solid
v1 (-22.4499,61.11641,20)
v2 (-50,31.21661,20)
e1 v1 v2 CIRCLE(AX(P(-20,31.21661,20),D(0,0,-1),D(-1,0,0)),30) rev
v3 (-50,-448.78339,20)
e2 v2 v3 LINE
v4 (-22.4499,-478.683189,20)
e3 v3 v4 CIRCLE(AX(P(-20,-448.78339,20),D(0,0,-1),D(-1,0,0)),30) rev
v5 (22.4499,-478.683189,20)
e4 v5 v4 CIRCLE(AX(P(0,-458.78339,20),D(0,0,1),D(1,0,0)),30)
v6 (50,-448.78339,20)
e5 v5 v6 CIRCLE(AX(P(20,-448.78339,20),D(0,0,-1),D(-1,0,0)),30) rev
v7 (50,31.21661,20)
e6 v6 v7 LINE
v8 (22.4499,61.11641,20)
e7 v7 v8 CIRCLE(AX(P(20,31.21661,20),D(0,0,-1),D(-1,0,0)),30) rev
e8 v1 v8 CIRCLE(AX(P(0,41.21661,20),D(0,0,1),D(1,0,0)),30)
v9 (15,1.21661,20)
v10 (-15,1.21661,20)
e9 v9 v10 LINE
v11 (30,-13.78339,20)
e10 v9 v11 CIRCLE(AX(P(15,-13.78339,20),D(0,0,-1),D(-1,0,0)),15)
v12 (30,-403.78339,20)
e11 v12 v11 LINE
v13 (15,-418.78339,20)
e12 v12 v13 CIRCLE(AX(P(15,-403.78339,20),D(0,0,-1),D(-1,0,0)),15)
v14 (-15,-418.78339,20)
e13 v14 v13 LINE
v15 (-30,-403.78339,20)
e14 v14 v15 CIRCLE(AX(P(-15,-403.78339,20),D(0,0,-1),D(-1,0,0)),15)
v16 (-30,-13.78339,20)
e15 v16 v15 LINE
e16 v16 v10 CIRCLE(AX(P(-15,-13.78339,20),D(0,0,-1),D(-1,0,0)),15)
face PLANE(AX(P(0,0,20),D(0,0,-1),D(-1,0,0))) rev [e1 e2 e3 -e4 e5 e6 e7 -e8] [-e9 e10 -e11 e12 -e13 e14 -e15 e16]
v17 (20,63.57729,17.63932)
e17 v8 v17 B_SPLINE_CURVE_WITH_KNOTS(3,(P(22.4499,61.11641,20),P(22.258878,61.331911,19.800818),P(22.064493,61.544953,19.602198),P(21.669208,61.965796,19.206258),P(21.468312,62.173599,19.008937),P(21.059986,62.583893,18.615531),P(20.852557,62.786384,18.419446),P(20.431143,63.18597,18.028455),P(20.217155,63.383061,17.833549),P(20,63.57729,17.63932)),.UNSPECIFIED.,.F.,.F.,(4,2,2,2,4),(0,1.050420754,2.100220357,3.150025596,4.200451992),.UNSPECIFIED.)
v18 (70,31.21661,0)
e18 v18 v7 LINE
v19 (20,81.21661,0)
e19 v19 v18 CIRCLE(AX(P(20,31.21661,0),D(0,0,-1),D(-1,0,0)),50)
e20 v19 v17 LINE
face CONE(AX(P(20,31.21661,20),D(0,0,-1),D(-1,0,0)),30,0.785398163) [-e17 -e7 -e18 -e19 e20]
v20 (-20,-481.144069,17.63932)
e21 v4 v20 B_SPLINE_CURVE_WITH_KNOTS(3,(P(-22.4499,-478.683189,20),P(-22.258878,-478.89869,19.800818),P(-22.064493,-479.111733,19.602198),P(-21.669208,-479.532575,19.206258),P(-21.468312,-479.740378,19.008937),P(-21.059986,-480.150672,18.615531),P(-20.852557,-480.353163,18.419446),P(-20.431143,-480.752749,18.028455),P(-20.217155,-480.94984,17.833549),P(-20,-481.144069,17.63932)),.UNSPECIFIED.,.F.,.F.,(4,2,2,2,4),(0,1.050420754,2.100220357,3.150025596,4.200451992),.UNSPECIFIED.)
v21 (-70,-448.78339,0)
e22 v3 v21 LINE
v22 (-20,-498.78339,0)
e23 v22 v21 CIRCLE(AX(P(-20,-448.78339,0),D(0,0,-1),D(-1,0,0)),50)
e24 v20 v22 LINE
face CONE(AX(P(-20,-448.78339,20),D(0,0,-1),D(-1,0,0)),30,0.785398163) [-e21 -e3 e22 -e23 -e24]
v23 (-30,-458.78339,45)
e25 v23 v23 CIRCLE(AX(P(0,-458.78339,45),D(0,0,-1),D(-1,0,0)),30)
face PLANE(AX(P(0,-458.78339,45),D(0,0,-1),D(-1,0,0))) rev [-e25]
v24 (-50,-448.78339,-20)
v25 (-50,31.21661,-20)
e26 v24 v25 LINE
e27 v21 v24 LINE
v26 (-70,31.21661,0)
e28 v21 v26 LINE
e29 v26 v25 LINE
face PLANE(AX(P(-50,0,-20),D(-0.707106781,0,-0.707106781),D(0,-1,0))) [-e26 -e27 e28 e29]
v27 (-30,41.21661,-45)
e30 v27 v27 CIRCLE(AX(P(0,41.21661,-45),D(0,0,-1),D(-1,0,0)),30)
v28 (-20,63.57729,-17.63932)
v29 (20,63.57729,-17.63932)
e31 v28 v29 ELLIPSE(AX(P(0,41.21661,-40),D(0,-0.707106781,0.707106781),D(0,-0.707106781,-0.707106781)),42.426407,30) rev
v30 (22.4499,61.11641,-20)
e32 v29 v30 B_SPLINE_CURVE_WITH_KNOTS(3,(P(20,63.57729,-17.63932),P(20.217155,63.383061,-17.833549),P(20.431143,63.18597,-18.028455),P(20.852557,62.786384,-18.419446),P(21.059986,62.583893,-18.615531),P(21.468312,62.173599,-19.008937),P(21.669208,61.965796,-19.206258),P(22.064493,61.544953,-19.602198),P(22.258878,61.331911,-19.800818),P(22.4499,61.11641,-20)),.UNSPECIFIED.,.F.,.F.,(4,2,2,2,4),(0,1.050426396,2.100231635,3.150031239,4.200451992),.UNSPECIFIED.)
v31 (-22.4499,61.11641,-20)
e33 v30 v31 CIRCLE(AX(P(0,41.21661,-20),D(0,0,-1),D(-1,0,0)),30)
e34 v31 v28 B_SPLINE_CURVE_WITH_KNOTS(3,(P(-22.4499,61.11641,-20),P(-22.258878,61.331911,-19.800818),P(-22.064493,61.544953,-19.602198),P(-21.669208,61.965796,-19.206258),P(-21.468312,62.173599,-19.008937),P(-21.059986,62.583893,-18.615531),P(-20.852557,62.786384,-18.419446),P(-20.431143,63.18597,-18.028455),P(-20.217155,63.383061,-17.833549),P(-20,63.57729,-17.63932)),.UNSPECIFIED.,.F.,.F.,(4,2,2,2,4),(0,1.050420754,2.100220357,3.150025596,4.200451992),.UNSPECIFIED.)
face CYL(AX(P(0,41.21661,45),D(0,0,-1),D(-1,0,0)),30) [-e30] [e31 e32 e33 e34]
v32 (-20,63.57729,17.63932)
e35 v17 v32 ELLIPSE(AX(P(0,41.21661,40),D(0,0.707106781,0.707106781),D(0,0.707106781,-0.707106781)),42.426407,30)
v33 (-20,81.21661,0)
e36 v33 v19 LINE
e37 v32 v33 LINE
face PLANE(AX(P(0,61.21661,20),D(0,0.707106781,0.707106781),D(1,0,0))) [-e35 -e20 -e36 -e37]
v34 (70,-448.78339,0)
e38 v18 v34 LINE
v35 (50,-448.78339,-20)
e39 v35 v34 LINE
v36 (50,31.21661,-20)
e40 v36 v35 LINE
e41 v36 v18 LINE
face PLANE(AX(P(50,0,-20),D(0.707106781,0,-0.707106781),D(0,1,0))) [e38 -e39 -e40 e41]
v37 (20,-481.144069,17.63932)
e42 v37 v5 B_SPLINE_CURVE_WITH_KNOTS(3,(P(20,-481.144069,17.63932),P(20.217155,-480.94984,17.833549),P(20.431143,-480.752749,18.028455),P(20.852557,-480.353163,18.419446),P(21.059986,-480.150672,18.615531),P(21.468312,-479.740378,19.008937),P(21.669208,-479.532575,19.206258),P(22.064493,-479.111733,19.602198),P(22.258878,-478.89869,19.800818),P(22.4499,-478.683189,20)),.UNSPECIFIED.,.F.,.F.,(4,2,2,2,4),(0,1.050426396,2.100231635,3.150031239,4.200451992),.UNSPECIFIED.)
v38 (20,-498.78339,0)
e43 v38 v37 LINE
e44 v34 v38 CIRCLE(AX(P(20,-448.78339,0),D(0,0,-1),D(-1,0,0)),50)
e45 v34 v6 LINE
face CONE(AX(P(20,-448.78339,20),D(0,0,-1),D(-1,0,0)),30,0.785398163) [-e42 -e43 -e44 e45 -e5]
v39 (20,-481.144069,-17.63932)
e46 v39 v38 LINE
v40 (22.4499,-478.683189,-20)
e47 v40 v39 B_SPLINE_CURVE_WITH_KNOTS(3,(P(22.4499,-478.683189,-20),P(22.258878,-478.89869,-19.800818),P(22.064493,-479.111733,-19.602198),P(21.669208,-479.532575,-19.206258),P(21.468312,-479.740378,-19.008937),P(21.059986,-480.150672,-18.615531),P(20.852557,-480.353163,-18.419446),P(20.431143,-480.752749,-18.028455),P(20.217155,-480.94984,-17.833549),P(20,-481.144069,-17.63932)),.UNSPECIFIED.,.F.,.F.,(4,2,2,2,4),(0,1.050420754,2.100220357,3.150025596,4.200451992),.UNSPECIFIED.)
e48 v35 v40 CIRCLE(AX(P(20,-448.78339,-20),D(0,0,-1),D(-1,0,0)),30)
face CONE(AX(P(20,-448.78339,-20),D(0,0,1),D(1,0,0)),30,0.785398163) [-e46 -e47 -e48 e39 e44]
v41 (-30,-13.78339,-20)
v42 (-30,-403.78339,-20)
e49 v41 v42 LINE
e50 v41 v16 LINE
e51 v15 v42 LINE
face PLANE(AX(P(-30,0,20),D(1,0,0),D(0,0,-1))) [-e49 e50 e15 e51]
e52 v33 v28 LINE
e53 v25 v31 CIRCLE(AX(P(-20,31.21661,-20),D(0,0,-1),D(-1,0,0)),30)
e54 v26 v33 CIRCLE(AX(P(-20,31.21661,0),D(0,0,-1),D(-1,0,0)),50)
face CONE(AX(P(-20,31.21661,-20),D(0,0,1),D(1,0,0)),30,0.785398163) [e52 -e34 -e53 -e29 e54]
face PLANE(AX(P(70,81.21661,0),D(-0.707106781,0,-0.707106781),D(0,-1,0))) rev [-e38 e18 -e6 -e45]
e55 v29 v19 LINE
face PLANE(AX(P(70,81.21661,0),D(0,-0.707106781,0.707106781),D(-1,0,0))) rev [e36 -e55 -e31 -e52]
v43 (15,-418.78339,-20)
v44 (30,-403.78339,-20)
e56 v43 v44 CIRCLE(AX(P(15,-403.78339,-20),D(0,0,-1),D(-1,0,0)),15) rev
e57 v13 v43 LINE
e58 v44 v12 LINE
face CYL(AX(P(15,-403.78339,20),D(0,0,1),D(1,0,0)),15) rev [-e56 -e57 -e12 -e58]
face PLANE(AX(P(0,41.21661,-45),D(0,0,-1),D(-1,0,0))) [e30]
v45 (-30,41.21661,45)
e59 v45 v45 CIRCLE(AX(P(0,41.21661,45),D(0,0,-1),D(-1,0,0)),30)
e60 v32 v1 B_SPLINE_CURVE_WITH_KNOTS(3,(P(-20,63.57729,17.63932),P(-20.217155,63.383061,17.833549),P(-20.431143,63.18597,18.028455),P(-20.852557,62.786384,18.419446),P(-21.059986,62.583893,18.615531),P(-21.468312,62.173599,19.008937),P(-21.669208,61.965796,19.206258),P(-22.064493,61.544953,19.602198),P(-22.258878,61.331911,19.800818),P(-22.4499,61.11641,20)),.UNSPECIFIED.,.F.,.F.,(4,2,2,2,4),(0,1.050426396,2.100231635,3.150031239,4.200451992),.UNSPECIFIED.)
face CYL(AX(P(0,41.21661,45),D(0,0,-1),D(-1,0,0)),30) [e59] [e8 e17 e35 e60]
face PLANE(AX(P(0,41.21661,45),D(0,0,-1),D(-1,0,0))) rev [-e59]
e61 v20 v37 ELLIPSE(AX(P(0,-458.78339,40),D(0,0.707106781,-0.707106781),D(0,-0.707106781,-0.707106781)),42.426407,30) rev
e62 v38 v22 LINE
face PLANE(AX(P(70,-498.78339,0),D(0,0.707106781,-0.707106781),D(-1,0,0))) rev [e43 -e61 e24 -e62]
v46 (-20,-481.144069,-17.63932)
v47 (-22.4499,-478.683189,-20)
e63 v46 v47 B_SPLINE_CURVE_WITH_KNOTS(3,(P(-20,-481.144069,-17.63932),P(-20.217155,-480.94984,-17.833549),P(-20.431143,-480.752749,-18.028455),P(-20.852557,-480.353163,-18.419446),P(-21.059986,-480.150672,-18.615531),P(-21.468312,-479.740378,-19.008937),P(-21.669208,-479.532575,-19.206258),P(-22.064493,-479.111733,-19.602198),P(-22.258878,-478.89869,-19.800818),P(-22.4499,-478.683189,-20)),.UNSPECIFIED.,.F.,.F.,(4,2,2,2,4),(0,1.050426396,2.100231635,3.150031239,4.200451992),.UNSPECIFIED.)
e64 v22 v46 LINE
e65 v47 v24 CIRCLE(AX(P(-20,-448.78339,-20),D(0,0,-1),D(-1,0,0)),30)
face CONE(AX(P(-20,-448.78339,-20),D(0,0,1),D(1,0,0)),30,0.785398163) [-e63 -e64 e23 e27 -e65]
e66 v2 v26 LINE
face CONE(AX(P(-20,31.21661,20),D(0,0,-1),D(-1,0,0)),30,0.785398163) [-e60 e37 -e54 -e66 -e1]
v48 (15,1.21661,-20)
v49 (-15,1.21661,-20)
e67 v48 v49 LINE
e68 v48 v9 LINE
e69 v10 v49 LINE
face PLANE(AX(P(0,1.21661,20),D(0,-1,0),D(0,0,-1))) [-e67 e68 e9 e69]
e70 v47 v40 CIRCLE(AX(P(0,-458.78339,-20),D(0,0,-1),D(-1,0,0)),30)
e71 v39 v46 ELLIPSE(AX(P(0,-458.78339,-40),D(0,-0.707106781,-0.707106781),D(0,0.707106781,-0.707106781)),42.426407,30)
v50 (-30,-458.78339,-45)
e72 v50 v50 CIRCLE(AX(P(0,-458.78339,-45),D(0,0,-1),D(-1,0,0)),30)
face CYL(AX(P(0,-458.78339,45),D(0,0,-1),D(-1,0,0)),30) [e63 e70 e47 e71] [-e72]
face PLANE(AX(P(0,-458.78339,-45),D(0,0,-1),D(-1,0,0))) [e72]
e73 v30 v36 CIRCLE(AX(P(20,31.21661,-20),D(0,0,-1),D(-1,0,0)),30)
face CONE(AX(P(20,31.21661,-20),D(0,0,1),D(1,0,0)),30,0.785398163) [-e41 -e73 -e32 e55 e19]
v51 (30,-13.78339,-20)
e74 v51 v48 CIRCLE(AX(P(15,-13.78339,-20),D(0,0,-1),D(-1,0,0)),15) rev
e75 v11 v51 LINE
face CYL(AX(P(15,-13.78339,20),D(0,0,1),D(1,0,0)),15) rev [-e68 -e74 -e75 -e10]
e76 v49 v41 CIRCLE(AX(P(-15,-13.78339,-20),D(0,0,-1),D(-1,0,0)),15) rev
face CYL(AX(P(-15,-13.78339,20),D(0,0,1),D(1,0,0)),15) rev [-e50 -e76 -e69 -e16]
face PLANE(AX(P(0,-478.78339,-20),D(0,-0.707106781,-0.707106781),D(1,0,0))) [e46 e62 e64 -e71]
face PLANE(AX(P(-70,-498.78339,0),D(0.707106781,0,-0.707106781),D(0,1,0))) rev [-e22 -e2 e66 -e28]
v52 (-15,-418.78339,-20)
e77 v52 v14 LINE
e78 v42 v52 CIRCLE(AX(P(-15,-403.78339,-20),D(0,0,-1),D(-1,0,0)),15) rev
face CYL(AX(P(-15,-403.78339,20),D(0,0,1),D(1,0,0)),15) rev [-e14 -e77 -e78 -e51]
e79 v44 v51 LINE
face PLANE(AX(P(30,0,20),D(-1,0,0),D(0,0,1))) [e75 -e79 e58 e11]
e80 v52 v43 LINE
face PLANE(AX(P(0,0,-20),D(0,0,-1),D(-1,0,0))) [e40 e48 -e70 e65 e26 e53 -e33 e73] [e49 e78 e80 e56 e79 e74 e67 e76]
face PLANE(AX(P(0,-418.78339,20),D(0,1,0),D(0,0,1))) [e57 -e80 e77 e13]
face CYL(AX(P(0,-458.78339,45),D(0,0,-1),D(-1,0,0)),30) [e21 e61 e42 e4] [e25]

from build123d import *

# Parameters (mm, degrees)
EXTRUDE_1_DEPTH      = 20
EXTRUDE_1_DEPTH_BACK = 20
SKETCH_1_W           = 140
SKETCH_1_H           = 580
SKETCH_1_R           = 30
EXTRUDE_2_DEPTH      = 25
EXTRUDE_2_DEPTH_BACK = 65
SKETCH_3_R           = 30
CUT_EXTRUDE_1_DEPTH  = 40
FILLET_1_R           = 50
FILLET_2_R           = 15
CHAMFER_1_SIZE       = 20


with BuildPart() as part:
    # Эскиз1 → Бобышка-Вытянуть1 (new, two sides: drawn at the far end of the back side and taken through both)
    with BuildSketch(Plane.XY.offset(-EXTRUDE_1_DEPTH_BACK)):
        with Locations((0, -208.783389553)):
            Rectangle(SKETCH_1_W, SKETCH_1_H)
        with Locations((0, 41.216610447)):
            Circle(SKETCH_1_R, mode=Mode.SUBTRACT)
        with Locations((0, -458.783389553)):
            Circle(SKETCH_1_R, mode=Mode.SUBTRACT)
    extrude(amount=EXTRUDE_1_DEPTH + EXTRUDE_1_DEPTH_BACK)

    # Эскиз3 → Бобышка-Вытянуть2 (add, two sides: drawn at the far end of the back side and taken through both)
    with BuildSketch(Plane(origin=(0, 0, -20), x_dir=(-1, 0, 0), z_dir=(0, 0, -1)).offset(-EXTRUDE_2_DEPTH_BACK)):
        with Locations((0, 41.216610447)):
            Circle(SKETCH_3_R)
        with Locations((0, -458.783389553)):
            Circle(SKETCH_3_R)
    extrude(amount=EXTRUDE_2_DEPTH + EXTRUDE_2_DEPTH_BACK)

    # Эскиз4 → Вырез-Вытянуть1 (cut)
    with BuildSketch(Plane(origin=(0, 0, -20), x_dir=(-1, 0, 0), z_dir=(0, 0, -1))):
        Polygon((-30, 1.216610447), (0, 1.216610447), (30, 1.216610447), (30, -418.783389553), (0, -418.783389553), (-30, -418.783389553), align=None)
    extrude(amount=-CUT_EXTRUDE_1_DEPTH, mode=Mode.SUBTRACT)

    # Скругление1
    fillet_1_edges = [part.edges().sort_by_distance(p)[0] for p in [
        (70, -498.783389553, 0),
        (70, 81.216610447, 0),
        (-70, 81.216610447, 0),
        (-70, -498.783389553, 0),
    ]]
    fillet(fillet_1_edges, radius=FILLET_1_R)

    # Скругление2
    fillet_2_edges = [part.edges().sort_by_distance(p)[0] for p in [
        (30, 1.216610447, 0),
        (-30, 1.216610447, 0),
        (-30, -418.783389553, 0),
        (30, -418.783389553, 0),
    ]]
    fillet(fillet_2_edges, radius=FILLET_2_R)

    # Фаска1
    # the kernel refuses this chamfer: 20 mm, written as the material it takes off along each edge
    with BuildSketch(Plane(origin=(20, -498.783389553, -20), x_dir=(0, -0.0274958766105877, 0.9996219169112968), z_dir=(-1, 0, 0))) as chamfer_1_piece_1_section:
        Polygon((CHAMFER_1_SIZE * 0.999621916911, CHAMFER_1_SIZE * 0.0274958766106), (-CHAMFER_1_SIZE * 0.0274958766106, CHAMFER_1_SIZE * 0.999621916911), (0, 0), align=None)
    chamfer_1_piece_1 = extrude(amount=40, mode=Mode.PRIVATE)
    chamfer_1_piece_1 = chamfer_1_piece_1 - Plane(origin=(0, -458.783389553, -12.567480213), x_dir=(-1, 0, 0), z_dir=(0, 0, 1)) * Cylinder(30, 160, mode=Mode.PRIVATE)
    add(chamfer_1_piece_1, mode=Mode.SUBTRACT)
    with BuildSketch(Plane(origin=(-20, -448.783389553, -20), x_dir=(0, -1, 0), z_dir=(1, 0, 0))) as chamfer_1_piece_2_section:
        Polygon((50, -CHAMFER_1_SIZE), (50 - CHAMFER_1_SIZE, 0), (50, 0), align=None)
    chamfer_1_piece_2 = revolve(axis=Axis((-20, -448.783389553, -20), (0, 0, -1)), revolution_arc=90, mode=Mode.PRIVATE)
    chamfer_1_piece_2 = chamfer_1_piece_2 - Plane(origin=(0, -458.783389553, -13.088521936), x_dir=(-1, 0, 0), z_dir=(0, 0, 1)) * Cylinder(30, 200, mode=Mode.PRIVATE)
    add(chamfer_1_piece_2, mode=Mode.SUBTRACT)
    with BuildSketch(Plane(origin=(20, -448.783389553, -20), x_dir=(1, 0, 0), z_dir=(0, 1, 0))) as chamfer_1_piece_3_section:
        Polygon((50, -CHAMFER_1_SIZE), (50 - CHAMFER_1_SIZE, 0), (50, 0), align=None)
    chamfer_1_piece_3 = revolve(axis=Axis((20, -448.783389553, -20), (0, 0, -1)), revolution_arc=90, mode=Mode.PRIVATE)
    chamfer_1_piece_3 = chamfer_1_piece_3 - Plane(origin=(0, -458.783389553, -13.088521936), x_dir=(-1, 0, 0), z_dir=(0, 0, 1)) * Cylinder(30, 200, mode=Mode.PRIVATE)
    add(chamfer_1_piece_3, mode=Mode.SUBTRACT)
    with BuildSketch(Plane(origin=(-70, -448.783389553, -20), x_dir=(-0.027495876610586317, 0, 0.9996219169112968), z_dir=(0, 1, 0)), Plane(origin=(70, 31.216610447, -20), x_dir=(0.027495876610586317, 0, 0.9996219169112968), z_dir=(0, -1, 0)), Plane(origin=(70, 31.216610447, 20), x_dir=(-0.9996219169112968, 0, 0.027495876610586317), z_dir=(0, -1, 0)), Plane(origin=(-70, -448.783389553, 20), x_dir=(0.9996219169112968, 0, 0.027495876610586317), z_dir=(0, 1, 0))) as chamfer_1_piece_4:
        Polygon((CHAMFER_1_SIZE * 0.999621916911, CHAMFER_1_SIZE * 0.0274958766106), (-CHAMFER_1_SIZE * 0.0274958766106, CHAMFER_1_SIZE * 0.999621916911), (0, 0), align=None)
    extrude(amount=480, mode=Mode.SUBTRACT)
    with BuildSketch(Plane(origin=(-20, 31.216610447, -20), x_dir=(0, 1, 0), z_dir=(1, 0, 0))) as chamfer_1_piece_5_section:
        Polygon((50, CHAMFER_1_SIZE), (50 - CHAMFER_1_SIZE, 0), (50, 0), align=None)
    chamfer_1_piece_5 = revolve(axis=Axis((-20, 31.216610447, -20), (0, 0, 1)), revolution_arc=90, mode=Mode.PRIVATE)
    chamfer_1_piece_5 = chamfer_1_piece_5 - Plane(origin=(0, 41.216610447, -13.088521936), x_dir=(-1, 0, 0), z_dir=(0, 0, 1)) * Cylinder(30, 200, mode=Mode.PRIVATE)
    add(chamfer_1_piece_5, mode=Mode.SUBTRACT)
    with BuildSketch(Plane(origin=(20, 31.216610447, -20), x_dir=(1, 0, 0), z_dir=(0, -1, 0))) as chamfer_1_piece_6_section:
        Polygon((50, CHAMFER_1_SIZE), (50 - CHAMFER_1_SIZE, 0), (50, 0), align=None)
    chamfer_1_piece_6 = revolve(axis=Axis((20, 31.216610447, -20), (0, 0, 1)), revolution_arc=90, mode=Mode.PRIVATE)
    chamfer_1_piece_6 = chamfer_1_piece_6 - Plane(origin=(0, 41.216610447, -13.088521936), x_dir=(-1, 0, 0), z_dir=(0, 0, 1)) * Cylinder(30, 200, mode=Mode.PRIVATE)
    add(chamfer_1_piece_6, mode=Mode.SUBTRACT)
    with BuildSketch(Plane(origin=(-20, 81.216610447, -20), x_dir=(0, 0.027495876610586317, 0.9996219169112968), z_dir=(1, 0, 0))) as chamfer_1_piece_7_section:
        Polygon((CHAMFER_1_SIZE * 0.999621916911, CHAMFER_1_SIZE * 0.0274958766106), (-CHAMFER_1_SIZE * 0.0274958766106, CHAMFER_1_SIZE * 0.999621916911), (0, 0), align=None)
    chamfer_1_piece_7 = extrude(amount=40, mode=Mode.PRIVATE)
    chamfer_1_piece_7 = chamfer_1_piece_7 - Plane(origin=(0, 41.216610447, -12.567480213), x_dir=(-1, 0, 0), z_dir=(0, 0, 1)) * Cylinder(30, 160, mode=Mode.PRIVATE)
    add(chamfer_1_piece_7, mode=Mode.SUBTRACT)
    with BuildSketch(Plane(origin=(20, -498.783389553, 20), x_dir=(0, 0.9996219169112968, 0.027495876610586206), z_dir=(-1, 0, 0))) as chamfer_1_piece_8_section:
        Polygon((CHAMFER_1_SIZE * 0.999621916911, CHAMFER_1_SIZE * 0.0274958766106), (-CHAMFER_1_SIZE * 0.0274958766106, CHAMFER_1_SIZE * 0.999621916911), (0, 0), align=None)
    chamfer_1_piece_8 = extrude(amount=40, mode=Mode.PRIVATE)
    chamfer_1_piece_8 = chamfer_1_piece_8 - Plane(origin=(0, -458.783389553, 12.567480585), x_dir=(-1, 0, 0), z_dir=(0, 0, -1)) * Cylinder(30, 160, mode=Mode.PRIVATE)
    add(chamfer_1_piece_8, mode=Mode.SUBTRACT)
    with BuildSketch(Plane(origin=(20, -448.783389553, 20), x_dir=(1, 0, 0), z_dir=(0, 1, 0))) as chamfer_1_piece_9_section:
        Polygon((50 - CHAMFER_1_SIZE, 0), (50, CHAMFER_1_SIZE), (50, 0), align=None)
    chamfer_1_piece_9 = revolve(axis=Axis((20, -448.783389553, 20), (0, 0, -1)), revolution_arc=90, mode=Mode.PRIVATE)
    chamfer_1_piece_9 = chamfer_1_piece_9 - Plane(origin=(0, -458.783389553, 13.088521928), x_dir=(-1, 0, 0), z_dir=(0, 0, -1)) * Cylinder(30, 200, mode=Mode.PRIVATE)
    add(chamfer_1_piece_9, mode=Mode.SUBTRACT)
    with BuildSketch(Plane(origin=(-20, -448.783389553, 20), x_dir=(0, -1, 0), z_dir=(1, 0, 0))) as chamfer_1_piece_10_section:
        Polygon((50 - CHAMFER_1_SIZE, 0), (50, CHAMFER_1_SIZE), (50, 0), align=None)
    chamfer_1_piece_10 = revolve(axis=Axis((-20, -448.783389553, 20), (0, 0, -1)), revolution_arc=90, mode=Mode.PRIVATE)
    chamfer_1_piece_10 = chamfer_1_piece_10 - Plane(origin=(0, -458.783389553, 13.088521939), x_dir=(-1, 0, 0), z_dir=(0, 0, -1)) * Cylinder(30, 200, mode=Mode.PRIVATE)
    add(chamfer_1_piece_10, mode=Mode.SUBTRACT)
    with BuildSketch(Plane(origin=(20, 31.216610447, 20), x_dir=(1, 0, 0), z_dir=(0, -1, 0))) as chamfer_1_piece_11_section:
        Polygon((50 - CHAMFER_1_SIZE, 0), (50, -CHAMFER_1_SIZE), (50, 0), align=None)
    chamfer_1_piece_11 = revolve(axis=Axis((20, 31.216610447, 20), (0, 0, 1)), revolution_arc=90, mode=Mode.PRIVATE)
    chamfer_1_piece_11 = chamfer_1_piece_11 - Plane(origin=(0, 41.216610447, 13.088521931), x_dir=(-1, 0, 0), z_dir=(0, 0, -1)) * Cylinder(30, 200, mode=Mode.PRIVATE)
    add(chamfer_1_piece_11, mode=Mode.SUBTRACT)
    with BuildSketch(Plane(origin=(-20, 31.216610447, 20), x_dir=(0, 1, 0), z_dir=(1, 0, 0))) as chamfer_1_piece_12_section:
        Polygon((50 - CHAMFER_1_SIZE, 0), (50, -CHAMFER_1_SIZE), (50, 0), align=None)
    chamfer_1_piece_12 = revolve(axis=Axis((-20, 31.216610447, 20), (0, 0, 1)), revolution_arc=90, mode=Mode.PRIVATE)
    chamfer_1_piece_12 = chamfer_1_piece_12 - Plane(origin=(0, 41.216610447, 13.088521936), x_dir=(-1, 0, 0), z_dir=(0, 0, -1)) * Cylinder(30, 200, mode=Mode.PRIVATE)
    add(chamfer_1_piece_12, mode=Mode.SUBTRACT)
    with BuildSketch(Plane(origin=(-20, 81.216610447, 20), x_dir=(0, -0.9996219169112968, 0.027495876610586337), z_dir=(1, 0, 0))) as chamfer_1_piece_13_section:
        Polygon((CHAMFER_1_SIZE * 0.999621916911, CHAMFER_1_SIZE * 0.0274958766106), (-CHAMFER_1_SIZE * 0.0274958766106, CHAMFER_1_SIZE * 0.999621916911), (0, 0), align=None)
    chamfer_1_piece_13 = extrude(amount=40, mode=Mode.PRIVATE)
    chamfer_1_piece_13 = chamfer_1_piece_13 - Plane(origin=(0, 41.216610447, 12.567480585), x_dir=(-1, 0, 0), z_dir=(0, 0, -1)) * Cylinder(30, 160, mode=Mode.PRIVATE)
    add(chamfer_1_piece_13, mode=Mode.SUBTRACT)


solid = part.part
